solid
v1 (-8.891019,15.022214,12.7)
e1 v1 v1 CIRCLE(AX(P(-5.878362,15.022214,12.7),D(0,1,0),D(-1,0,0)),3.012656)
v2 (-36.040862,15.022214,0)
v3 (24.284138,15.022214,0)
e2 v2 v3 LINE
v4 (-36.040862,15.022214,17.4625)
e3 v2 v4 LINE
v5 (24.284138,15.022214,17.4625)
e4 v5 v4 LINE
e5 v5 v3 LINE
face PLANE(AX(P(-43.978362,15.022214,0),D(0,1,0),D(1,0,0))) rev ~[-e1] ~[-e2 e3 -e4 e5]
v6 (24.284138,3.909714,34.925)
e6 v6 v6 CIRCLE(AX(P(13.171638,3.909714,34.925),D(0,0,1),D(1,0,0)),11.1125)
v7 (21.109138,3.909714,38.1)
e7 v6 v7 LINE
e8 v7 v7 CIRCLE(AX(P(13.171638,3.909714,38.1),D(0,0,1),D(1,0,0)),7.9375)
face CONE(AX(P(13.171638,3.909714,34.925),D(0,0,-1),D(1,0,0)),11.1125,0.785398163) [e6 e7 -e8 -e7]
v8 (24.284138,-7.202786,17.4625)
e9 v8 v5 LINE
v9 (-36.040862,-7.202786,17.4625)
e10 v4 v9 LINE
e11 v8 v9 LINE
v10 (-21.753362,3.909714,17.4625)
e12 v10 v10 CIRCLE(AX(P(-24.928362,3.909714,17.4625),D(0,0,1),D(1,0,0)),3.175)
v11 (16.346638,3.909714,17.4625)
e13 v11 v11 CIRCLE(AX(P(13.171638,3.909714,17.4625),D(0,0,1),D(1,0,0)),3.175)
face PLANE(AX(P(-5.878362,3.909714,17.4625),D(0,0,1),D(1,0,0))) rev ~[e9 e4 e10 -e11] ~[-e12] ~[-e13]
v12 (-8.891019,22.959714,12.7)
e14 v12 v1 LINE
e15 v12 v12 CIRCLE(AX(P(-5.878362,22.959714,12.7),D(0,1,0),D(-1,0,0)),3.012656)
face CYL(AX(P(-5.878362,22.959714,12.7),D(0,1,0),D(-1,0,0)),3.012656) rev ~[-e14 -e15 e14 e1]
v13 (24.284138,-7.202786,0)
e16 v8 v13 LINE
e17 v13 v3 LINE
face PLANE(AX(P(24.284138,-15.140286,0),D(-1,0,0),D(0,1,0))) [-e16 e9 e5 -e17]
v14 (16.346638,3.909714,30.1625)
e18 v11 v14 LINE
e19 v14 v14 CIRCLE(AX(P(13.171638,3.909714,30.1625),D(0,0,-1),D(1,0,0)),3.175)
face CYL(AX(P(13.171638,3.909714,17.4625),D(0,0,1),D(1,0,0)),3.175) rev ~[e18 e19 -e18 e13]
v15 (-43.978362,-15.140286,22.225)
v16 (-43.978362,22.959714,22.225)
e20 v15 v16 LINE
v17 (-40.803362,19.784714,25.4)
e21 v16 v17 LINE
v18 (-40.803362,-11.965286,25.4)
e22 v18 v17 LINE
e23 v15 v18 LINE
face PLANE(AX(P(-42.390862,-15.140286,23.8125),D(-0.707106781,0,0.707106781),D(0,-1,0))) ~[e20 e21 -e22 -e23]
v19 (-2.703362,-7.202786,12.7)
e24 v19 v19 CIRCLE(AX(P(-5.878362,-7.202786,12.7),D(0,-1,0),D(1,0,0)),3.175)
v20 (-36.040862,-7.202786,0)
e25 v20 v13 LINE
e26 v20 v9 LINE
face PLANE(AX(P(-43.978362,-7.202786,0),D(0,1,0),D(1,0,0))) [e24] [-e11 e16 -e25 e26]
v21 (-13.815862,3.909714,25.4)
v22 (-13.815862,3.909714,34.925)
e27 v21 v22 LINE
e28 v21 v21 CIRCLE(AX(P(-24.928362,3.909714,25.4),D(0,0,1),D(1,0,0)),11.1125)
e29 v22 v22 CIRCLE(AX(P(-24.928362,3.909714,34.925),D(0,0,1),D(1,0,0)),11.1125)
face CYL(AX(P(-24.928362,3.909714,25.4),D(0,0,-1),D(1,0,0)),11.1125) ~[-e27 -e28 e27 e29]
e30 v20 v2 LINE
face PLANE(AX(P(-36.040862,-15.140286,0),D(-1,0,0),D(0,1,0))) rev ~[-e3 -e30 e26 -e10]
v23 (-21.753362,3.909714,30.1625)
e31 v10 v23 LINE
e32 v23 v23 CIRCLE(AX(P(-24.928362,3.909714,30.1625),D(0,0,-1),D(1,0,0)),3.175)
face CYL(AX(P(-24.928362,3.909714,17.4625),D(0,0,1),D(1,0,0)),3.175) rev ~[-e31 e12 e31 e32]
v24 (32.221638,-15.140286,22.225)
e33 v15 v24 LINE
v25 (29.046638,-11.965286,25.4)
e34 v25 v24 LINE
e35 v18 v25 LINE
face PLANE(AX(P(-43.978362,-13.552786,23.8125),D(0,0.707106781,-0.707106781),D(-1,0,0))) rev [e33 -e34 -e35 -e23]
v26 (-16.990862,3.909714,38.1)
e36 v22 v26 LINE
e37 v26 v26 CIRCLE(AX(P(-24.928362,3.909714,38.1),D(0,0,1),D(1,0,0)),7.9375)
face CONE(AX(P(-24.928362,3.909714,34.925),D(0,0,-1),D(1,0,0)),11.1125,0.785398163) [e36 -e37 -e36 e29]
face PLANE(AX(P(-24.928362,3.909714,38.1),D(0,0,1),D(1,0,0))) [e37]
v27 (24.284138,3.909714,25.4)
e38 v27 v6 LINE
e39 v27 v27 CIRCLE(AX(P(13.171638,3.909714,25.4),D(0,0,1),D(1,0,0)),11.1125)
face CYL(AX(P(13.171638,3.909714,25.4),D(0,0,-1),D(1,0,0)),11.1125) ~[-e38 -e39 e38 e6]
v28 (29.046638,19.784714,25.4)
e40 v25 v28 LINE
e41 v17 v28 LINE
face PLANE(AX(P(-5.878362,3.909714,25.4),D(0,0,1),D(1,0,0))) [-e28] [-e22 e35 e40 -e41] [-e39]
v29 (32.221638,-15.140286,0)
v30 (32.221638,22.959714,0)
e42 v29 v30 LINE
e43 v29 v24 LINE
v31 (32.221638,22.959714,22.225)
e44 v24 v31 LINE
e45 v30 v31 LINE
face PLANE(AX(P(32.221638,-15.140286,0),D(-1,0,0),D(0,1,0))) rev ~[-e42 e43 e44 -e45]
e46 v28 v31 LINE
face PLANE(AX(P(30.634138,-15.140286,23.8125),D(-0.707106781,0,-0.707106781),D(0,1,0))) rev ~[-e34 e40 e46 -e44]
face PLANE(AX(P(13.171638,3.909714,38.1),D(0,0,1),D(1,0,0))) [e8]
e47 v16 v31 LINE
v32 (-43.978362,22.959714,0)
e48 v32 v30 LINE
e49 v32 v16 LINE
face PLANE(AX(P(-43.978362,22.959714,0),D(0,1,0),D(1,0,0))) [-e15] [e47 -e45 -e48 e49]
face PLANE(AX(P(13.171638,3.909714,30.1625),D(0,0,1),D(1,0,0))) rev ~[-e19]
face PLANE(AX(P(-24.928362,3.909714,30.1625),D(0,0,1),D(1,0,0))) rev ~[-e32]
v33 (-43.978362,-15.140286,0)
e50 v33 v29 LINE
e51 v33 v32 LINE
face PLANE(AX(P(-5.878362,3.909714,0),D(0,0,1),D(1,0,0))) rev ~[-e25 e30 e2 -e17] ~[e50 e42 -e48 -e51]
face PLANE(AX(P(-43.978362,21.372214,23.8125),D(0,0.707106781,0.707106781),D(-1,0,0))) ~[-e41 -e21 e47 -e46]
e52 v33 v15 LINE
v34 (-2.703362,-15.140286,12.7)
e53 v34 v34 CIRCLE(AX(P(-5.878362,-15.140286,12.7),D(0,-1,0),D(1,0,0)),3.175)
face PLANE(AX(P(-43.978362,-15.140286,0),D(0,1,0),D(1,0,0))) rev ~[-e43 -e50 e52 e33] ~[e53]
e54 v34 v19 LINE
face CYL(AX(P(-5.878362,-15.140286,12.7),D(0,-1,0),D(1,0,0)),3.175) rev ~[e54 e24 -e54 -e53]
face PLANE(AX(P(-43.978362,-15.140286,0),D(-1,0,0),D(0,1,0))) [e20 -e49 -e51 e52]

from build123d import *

# Parameters (mm, degrees)
F0_W     = 76.2
F0_H     = 38.1
F1_DEPTH = 25.4
F2_R     = 11.1125
F3_DEPTH = 12.7
F4_SIZE  = 3.175
F5_T     = 7.9375
F6_R     = 3.175
F7_DEPTH = 7.9375
F8_R     = 3.0126564395
F9_DEPTH = 7.9375


# Not quite as in the source:
# - a shell that OpenCascade refuses in one call is made with other operations: the cavity is built on its own and cut out


with BuildPart() as f1:
    # F0 (on Top) → F1 (new body)
    with BuildSketch(Plane.XY):
        with Locations((-5.8783623338, 3.9097142845)):
            Rectangle(F0_W, F0_H)
    extrude(amount=F1_DEPTH)

    # F2 (on face) → F3 (join)
    with BuildSketch(Plane.XY.offset(25.4)):
        with Locations((-24.9283623338, 3.9097142845)):
            Circle(F2_R)
        with Locations((13.1716376662, 3.9097142845)):
            Circle(F2_R)
    extrude(amount=F3_DEPTH)

    # F4
    f4_edges = [f1.edges().sort_by_distance(p)[0] for p in [
        (-36.040862, 3.909714, 38.1),
        (2.059138, 3.909714, 38.1),
        (32.221638, 3.909714, 25.4),
        (-5.878362, 22.959714, 25.4),
        (-43.978362, 3.909714, 25.4),
        (-5.878362, -15.140286, 25.4),
    ]]
    chamfer(f4_edges, length=F4_SIZE)

    # F5: shell of thickness 7.9375, made by hand


with BuildPart() as f5_core1:
    # F5_t2: copy of F1
    add(f1.part)

    # the walls: a layer under each face that stays
    f5_faces = [f5_core1.faces().sort_by_distance(p)[0] for p in [
        (32.2216376662, 3.9097142845, 11.1125),
        (-5.8783623338, -15.1402857155, 11.1125),
        (30.6341376662, 3.9097142845, 23.8125),
        (-5.8783623338, 22.9597142845, 11.1125),
        (-43.9783623338, 3.9097142845, 11.1125),
        (-5.8783623338, -13.5527857155, 23.8125),
        (-5.8783623338, 3.9097142845, 25.4),
        (-5.8783623338, 21.3722142845, 23.8125),
        (-42.3908623338, 3.9097142845, 23.8125),
        (-36.0408623338, 3.9097142845, 30.1625),
        (2.0591376662, 3.9097142845, 30.1625),
        (-34.4533623338, 3.9097142845, 36.5125),
        (3.6466376662, 3.9097142845, 36.5125),
        (-24.9283623338, 3.9097142845, 38.1),
        (13.1716376662, 3.9097142845, 38.1),
    ]]
    thicken(f5_faces, amount=-F5_T, mode=Mode.SUBTRACT)

    # F5_s3 → F5_t4 (revolve, cut)
    with BuildSketch(Plane.XZ.offset(-3.9097142845)):
        Polygon((-13.7364873338, 25.479375), (-13.8158623338, 17.4625), (-21.7533623338, 17.4625), (-21.7533623338, 25.4), align=None)
    revolve(axis=Axis((-24.9283623338, 3.9097142845, 25.4), (0, 0, 1)), mode=Mode.SUBTRACT)

    # F5_s5 → F5_t6 (revolve, cut)
    with BuildSketch(Plane.XZ.offset(-3.9097142845)):
        Polygon((24.3635126662, 25.479375), (24.2841376662, 17.4625), (16.3466376662, 17.4625), (16.3466376662, 25.4), align=None)
    revolve(axis=Axis((13.1716376662, 3.9097142845, 25.4), (0, 0, 1)), mode=Mode.SUBTRACT)


with BuildPart() as f1_1:
    add(f1.part)

    # what is left inside the walls is the cavity
    f5_cavity = [f5_core1.part.solids().sort_by_distance(p)[0] for p in [
        (-5.878362, 0.205548, 0.079375),
    ]]
    add(f5_cavity, mode=Mode.SUBTRACT)

    # F6 (on face) → F7 (cut)
    with BuildSketch(Plane.XZ.offset(15.1402857155)):
        with Locations((-5.8783623338, 12.7)):
            Circle(F6_R)
    extrude(amount=-F7_DEPTH, mode=Mode.SUBTRACT)

    # F8 (on face) → F9 (cut)
    with BuildSketch(Plane(origin=(0, 22.9597142845, 0), x_dir=(-1, 0, 0), z_dir=(0, 1, 0))):
        with Locations((5.8783623338, 12.7)):
            Circle(F8_R)
    extrude(amount=-F9_DEPTH, mode=Mode.SUBTRACT)


solid = f1_1.part
